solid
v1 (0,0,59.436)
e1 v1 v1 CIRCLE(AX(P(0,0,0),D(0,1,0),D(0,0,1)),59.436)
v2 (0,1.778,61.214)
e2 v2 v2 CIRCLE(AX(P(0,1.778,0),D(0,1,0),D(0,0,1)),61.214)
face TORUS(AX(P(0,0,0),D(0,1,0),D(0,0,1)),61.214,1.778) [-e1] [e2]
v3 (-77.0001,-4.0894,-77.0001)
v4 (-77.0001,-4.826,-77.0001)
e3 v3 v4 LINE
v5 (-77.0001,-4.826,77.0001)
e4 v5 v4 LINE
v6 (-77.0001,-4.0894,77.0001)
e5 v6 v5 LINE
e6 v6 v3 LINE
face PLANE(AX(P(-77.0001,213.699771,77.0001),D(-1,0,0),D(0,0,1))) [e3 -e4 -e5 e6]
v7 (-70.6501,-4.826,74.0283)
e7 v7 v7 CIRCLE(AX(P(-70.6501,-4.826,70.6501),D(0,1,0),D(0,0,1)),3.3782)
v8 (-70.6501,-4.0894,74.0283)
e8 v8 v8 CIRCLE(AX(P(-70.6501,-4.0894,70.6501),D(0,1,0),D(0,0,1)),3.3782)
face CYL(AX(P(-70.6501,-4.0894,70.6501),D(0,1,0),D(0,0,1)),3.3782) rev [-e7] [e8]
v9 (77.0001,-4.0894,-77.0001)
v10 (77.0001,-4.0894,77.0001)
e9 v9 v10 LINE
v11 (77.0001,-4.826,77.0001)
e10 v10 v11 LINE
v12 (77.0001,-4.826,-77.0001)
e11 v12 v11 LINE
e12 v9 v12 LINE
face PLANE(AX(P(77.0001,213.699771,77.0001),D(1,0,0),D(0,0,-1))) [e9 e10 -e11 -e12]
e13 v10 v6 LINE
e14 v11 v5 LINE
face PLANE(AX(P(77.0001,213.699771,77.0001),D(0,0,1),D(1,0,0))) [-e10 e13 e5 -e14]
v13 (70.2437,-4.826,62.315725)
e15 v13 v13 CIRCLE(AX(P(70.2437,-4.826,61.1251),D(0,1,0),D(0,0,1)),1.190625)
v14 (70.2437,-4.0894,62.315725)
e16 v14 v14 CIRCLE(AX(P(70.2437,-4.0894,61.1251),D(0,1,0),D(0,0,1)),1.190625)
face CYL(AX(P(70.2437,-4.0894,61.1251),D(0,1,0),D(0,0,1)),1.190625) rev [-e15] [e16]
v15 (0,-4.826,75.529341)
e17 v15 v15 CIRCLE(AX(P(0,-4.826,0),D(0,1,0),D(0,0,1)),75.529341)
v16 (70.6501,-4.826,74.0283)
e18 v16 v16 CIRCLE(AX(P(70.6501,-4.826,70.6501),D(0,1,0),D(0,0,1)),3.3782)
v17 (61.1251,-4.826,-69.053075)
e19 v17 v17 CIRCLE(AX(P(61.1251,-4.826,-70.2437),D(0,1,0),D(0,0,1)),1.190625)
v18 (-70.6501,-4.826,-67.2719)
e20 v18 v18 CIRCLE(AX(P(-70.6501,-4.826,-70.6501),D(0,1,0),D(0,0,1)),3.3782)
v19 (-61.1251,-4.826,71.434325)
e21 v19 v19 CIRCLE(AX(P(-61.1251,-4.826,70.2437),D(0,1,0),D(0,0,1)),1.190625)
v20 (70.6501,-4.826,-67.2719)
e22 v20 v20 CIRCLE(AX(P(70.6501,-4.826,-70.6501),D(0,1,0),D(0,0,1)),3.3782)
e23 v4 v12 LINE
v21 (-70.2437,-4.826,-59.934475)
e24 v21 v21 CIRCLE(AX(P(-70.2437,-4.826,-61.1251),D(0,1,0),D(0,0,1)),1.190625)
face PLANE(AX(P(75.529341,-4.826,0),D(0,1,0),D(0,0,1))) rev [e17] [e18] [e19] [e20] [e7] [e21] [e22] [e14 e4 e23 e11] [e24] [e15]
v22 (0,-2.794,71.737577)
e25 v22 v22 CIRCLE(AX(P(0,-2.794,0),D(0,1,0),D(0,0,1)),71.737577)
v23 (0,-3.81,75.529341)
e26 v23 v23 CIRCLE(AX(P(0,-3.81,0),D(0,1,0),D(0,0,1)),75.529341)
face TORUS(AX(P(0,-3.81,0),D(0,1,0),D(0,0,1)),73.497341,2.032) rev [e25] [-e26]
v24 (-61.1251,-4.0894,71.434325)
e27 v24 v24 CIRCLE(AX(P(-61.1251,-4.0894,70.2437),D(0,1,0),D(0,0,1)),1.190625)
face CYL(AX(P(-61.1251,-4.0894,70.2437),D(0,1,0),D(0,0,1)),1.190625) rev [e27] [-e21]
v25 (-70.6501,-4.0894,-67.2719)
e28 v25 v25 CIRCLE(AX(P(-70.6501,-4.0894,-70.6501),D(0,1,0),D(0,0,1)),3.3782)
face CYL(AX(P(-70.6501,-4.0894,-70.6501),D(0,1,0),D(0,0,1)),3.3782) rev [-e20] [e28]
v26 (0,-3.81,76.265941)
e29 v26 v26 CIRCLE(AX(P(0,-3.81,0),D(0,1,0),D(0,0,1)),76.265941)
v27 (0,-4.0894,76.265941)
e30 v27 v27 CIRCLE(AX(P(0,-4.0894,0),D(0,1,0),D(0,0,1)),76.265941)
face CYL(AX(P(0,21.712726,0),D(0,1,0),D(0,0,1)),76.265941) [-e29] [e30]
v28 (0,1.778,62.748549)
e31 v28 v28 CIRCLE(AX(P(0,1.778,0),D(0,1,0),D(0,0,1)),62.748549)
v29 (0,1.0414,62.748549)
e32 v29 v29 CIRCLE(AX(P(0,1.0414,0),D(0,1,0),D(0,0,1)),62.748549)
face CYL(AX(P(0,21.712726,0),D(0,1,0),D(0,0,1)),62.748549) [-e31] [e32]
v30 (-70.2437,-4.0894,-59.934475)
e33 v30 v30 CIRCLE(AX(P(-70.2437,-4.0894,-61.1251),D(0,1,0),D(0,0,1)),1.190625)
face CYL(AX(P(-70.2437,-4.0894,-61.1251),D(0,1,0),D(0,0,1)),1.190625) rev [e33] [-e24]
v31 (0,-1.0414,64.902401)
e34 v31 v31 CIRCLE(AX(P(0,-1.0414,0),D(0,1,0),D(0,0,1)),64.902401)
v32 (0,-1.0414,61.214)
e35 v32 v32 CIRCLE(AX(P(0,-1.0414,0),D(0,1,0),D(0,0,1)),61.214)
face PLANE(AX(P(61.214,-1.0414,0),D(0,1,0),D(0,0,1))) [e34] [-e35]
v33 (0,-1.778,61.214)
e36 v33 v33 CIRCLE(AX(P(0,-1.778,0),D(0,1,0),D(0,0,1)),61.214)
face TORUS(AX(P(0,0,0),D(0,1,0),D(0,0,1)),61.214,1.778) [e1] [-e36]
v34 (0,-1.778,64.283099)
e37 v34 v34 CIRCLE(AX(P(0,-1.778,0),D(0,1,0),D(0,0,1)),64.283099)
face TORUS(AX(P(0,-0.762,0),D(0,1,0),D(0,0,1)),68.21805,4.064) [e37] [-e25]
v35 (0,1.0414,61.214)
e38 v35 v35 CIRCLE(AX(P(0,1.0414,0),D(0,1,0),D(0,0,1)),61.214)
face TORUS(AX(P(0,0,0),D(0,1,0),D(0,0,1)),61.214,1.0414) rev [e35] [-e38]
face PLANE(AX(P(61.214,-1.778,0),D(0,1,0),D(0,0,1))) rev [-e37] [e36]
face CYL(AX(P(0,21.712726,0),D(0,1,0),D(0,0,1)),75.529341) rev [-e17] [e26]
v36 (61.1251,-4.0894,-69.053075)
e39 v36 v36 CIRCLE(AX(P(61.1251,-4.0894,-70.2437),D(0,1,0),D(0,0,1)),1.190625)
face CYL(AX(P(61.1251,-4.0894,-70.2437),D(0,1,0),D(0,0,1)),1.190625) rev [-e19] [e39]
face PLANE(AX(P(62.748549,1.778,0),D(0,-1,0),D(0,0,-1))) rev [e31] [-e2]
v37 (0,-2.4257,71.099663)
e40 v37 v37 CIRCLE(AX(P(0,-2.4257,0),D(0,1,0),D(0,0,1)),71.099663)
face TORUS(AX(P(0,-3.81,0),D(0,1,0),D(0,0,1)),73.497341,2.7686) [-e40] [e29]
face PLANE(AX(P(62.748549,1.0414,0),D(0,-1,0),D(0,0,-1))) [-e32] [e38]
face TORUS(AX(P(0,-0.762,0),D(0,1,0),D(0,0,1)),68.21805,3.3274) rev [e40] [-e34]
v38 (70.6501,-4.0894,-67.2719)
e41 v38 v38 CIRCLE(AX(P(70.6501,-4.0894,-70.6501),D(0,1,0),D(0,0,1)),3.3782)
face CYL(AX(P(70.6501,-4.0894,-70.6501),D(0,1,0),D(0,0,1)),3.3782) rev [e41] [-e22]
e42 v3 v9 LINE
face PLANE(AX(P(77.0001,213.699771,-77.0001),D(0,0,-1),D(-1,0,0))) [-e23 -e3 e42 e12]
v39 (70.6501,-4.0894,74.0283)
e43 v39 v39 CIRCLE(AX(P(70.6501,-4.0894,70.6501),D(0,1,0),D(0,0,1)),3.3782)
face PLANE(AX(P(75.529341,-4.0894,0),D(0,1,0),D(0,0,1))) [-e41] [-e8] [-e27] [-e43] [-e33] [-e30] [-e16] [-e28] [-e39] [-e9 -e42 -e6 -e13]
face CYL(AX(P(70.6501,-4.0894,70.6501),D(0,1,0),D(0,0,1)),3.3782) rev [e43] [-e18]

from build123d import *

# Parameters (mm, degrees)
SKETCH2_W                                 = 154.0002
SKETCH2_H                                 = 154.0002
SKETCH2_R                                 = 75.529340861
EXTRUDE1_DEPTH                            = 0.7366
EXTRUDE2_START                            = -0.7366
SKETCH3_R                                 = 75.529340861
EXTRUDE2_DEPTH                            = 0.7366
CIRPATTERN1_COUNT                         = 6
SKETCH5_W                                 = 3.3782
SKETCH5_H                                 = 0.7366
F_5_32_0_156250_DIAMETER_HOLE1_AT_2_COUNT = 2
F_5_32_0_156250_DIAMETER_HOLE1_AT_2_PITCH = 141.3002
F_5_32_0_156250_DIAMETER_HOLE1_AT_3_COUNT = 2
F_5_32_0_156250_DIAMETER_HOLE1_AT_3_PITCH = 141.3002
F_5_32_0_156250_DIAMETER_HOLE1_AT_4_COUNT = 2
F_5_32_0_156250_DIAMETER_HOLE1_AT_4_PITCH = 199.828659206
SKETCH7_W                                 = 2.3876
SKETCH7_H                                 = 8.128
F_5_32_0_156250_DIAMETER_HOLE2_AT_2_COUNT = 2
F_5_32_0_156250_DIAMETER_HOLE2_AT_2_PITCH = 121.0564
F_5_32_0_156250_DIAMETER_HOLE2_AT_3_COUNT = 2
F_5_32_0_156250_DIAMETER_HOLE2_AT_3_PITCH = 171.199602692
F_5_32_0_156250_DIAMETER_HOLE2_AT_4_COUNT = 2
F_5_32_0_156250_DIAMETER_HOLE2_AT_4_PITCH = 121.0564
CIRPATTERN2_COUNT                         = 4


# Read off the part's stored shape, not the designer's step: Revolve-Thin5
with BuildPart() as part:
    # Sketch1 → Revolve-Thin4 (revolve)
    with BuildSketch(Plane.XY, mode=Mode.PRIVATE) as revolve_thin4_sk:
        with BuildLine():
            Line((62.74854946, 1.778), (61.214, 1.778))
            ThreePointArc((61.214, 1.778), (59.436, 0), (61.214, -1.778))
            Line((61.214, -1.778), (64.28309892, -1.778))
            ThreePointArc((64.28309892, -1.778), (67.669225582, -4.788771381), (71.737577241, -2.794))
            ThreePointArc((71.737577241, -2.794), (74.023261161, -1.847238721), (75.529340861, -3.81))
            Line((75.529340861, -3.81), (75.529340861, -4.826))
            Line((75.529340861, -4.826), (77.0001, -4.826))
            Line((77.0001, -4.826), (77.0001, -4.0894))
            Line((77.0001, -4.0894), (76.265940861, -4.0894))
            Line((76.265940861, -4.0894), (76.265940861, -3.81))
            ThreePointArc((76.265940861, -3.81), (74.21390727, -1.135737757), (71.099662929, -2.4257))
            ThreePointArc((71.099662929, -2.4257), (67.492675346, -4.00937161), (64.902401285, -1.0414))
            Line((64.902401285, -1.0414), (61.214, -1.0414))
            ThreePointArc((61.214, -1.0414), (60.1726, 0), (61.214, 1.0414))
            Line((61.214, 1.0414), (62.74854946, 1.0414))
            Line((62.74854946, 1.0414), (62.74854946, 1.778))
        make_face()
    revolve(revolve_thin4_sk.sketch.rotate(Axis((0, 21.71272626, 0), (0, -1, 0)), 90), axis=Axis((0, 21.71272626, 0), (0, -1, 0)))

    # Sketch2 → Extrude1 (add)
    with BuildSketch(Plane.XZ.offset(4.826)):
        Rectangle(SKETCH2_W, SKETCH2_H)
        with Locations(Location((0, 0, 0), (0, 0, 90))):
            Circle(SKETCH2_R, mode=Mode.SUBTRACT)
    extrude(amount=-EXTRUDE1_DEPTH)

    # Sketch5 → 5/32 (0.156250) Diameter Hole1 (revolve, cut)
    with BuildSketch(Plane(origin=(70.6501, -4.0894, -70.6501), x_dir=(0, 0, 1), z_dir=(1, 0, 0))):
        with Locations((1.6891, 0.3683)):
            Rectangle(SKETCH5_W, SKETCH5_H)
    f_5_32_0_156250_diameter_hole1 = revolve(axis=Axis((70.6501, 2.2606, -70.6501), (0, -1, 0)), mode=Mode.SUBTRACT)

    # 5/32 (0.156250) Diameter Hole1 at 2: 5/32 (0.156250) Diameter Hole1 ×2
    with Locations(*[(0, 0, i * F_5_32_0_156250_DIAMETER_HOLE1_AT_2_PITCH) for i in range(1, F_5_32_0_156250_DIAMETER_HOLE1_AT_2_COUNT)]):
        add(f_5_32_0_156250_diameter_hole1, mode=Mode.SUBTRACT)

    # 5/32 (0.156250) Diameter Hole1 at 3: 5/32 (0.156250) Diameter Hole1 ×2
    with Locations(*[(-i * F_5_32_0_156250_DIAMETER_HOLE1_AT_3_PITCH, 0, 0) for i in range(1, F_5_32_0_156250_DIAMETER_HOLE1_AT_3_COUNT)]):
        add(f_5_32_0_156250_diameter_hole1, mode=Mode.SUBTRACT)

    # 5/32 (0.156250) Diameter Hole1 at 4: 5/32 (0.156250) Diameter Hole1 ×2
    with Locations(*[Vector(-0.7071067811865476, 0, 0.7071067811865476) * (i * F_5_32_0_156250_DIAMETER_HOLE1_AT_4_PITCH) for i in range(1, F_5_32_0_156250_DIAMETER_HOLE1_AT_4_COUNT)]):
        add(f_5_32_0_156250_diameter_hole1, mode=Mode.SUBTRACT)

    # Sketch11 → 3/32 (0.093750) Diameter Hole2 (revolve, cut)
    with BuildSketch(Plane(origin=(-70.2437, -4.0894, -61.1251), x_dir=(0, 0, 1), z_dir=(1, 0, 0))):
        Polygon((0, 0), (0, 26.115399675), (1.190625, 25.4), (1.190625, 0), align=None)
    f_3_32_0_093750_diameter_hole2 = revolve(axis=Axis((-70.2437, 2.2606, -61.1251), (0, -1, 0)), mode=Mode.SUBTRACT)

    # CirPattern2: 3/32 (0.093750) Diameter Hole2 ×4 about axis
    cirpattern2_axis = Axis((0, 0, 0), (0, 1, 0))
    for i in range(1, CIRPATTERN2_COUNT):
        add(f_3_32_0_093750_diameter_hole2.rotate(cirpattern2_axis, i * 360 / CIRPATTERN2_COUNT), mode=Mode.SUBTRACT)


with BuildPart() as body_2:
    # Revolve-Thin5 outline → Revolve-Thin5 (revolve)
    with BuildSketch(Plane.XY):
        with BuildLine():
            Line((76.265940861, 2.5654), (77.0001, 2.5654))
            Line((77.0001, 2.5654), (77.0001, 3.302))
            Line((77.0001, 3.302), (75.529340861, 3.302))
            Line((75.529340861, 3.302), (75.529340861, 2.286))
            ThreePointArc((75.529340861, 2.286), (74.023261161, 0.323238721), (71.737577241, 1.27))
            ThreePointArc((71.737577241, 1.27), (68.088390068, 3.299931105), (64.576093872, 1.0414))
            Line((64.576093872, 1.0414), (61.214, 1.0414))
            Line((61.214, 1.0414), (61.214, 0.3048))
            Line((61.214, 0.3048), (65.066299927, 0.3048))
            ThreePointArc((65.066299927, 0.3048), (67.890458911, 2.54923464), (71.099662929, 0.9017))
            ThreePointArc((71.099662929, 0.9017), (74.21390727, -0.388262243), (76.265940861, 2.286))
            Line((76.265940861, 2.286), (76.265940861, 2.5654))
        make_face()
    revolve(axis=Axis((0, 0, 0), (0, 1, 0)))

    # Sketch3 → Extrude2 (add)
    with BuildSketch(Plane(origin=(0, 3.302, 0), x_dir=(-1, 0, 0), z_dir=(0, 1, 0)).offset(EXTRUDE2_START)):
        Polygon((0, -108.894585724), (108.894585724, 0), (0, 108.894585724), (-108.894585724, 0), align=None)
        with Locations(Location((0, 0, 0), (0, 0, 90))):
            Circle(SKETCH3_R, mode=Mode.SUBTRACT)
    extrude(amount=EXTRUDE2_DEPTH)

    # Sketch7 → 5/32 (0.156250) Diameter Hole2 (revolve, cut)
    with BuildSketch(Plane(origin=(85.599801346, 3.302, 0), x_dir=(0, 0, 1), z_dir=(1, 0, 0))):
        with Locations((1.1938, 4.064)):
            Rectangle(SKETCH7_W, SKETCH7_H)
    f_5_32_0_156250_diameter_hole2 = revolve(axis=Axis((85.599801346, 9.652, 0), (0, -1, 0)), mode=Mode.SUBTRACT)

    # 5/32 (0.156250) Diameter Hole2 at 2: 5/32 (0.156250) Diameter Hole2 ×2
    with Locations(*[Vector(-0.7071067811865476, 0, -0.7071067811865476) * (i * F_5_32_0_156250_DIAMETER_HOLE2_AT_2_PITCH) for i in range(1, F_5_32_0_156250_DIAMETER_HOLE2_AT_2_COUNT)]):
        add(f_5_32_0_156250_diameter_hole2, mode=Mode.SUBTRACT)

    # 5/32 (0.156250) Diameter Hole2 at 3: 5/32 (0.156250) Diameter Hole2 ×2
    with Locations(*[(-i * F_5_32_0_156250_DIAMETER_HOLE2_AT_3_PITCH, 0, 0) for i in range(1, F_5_32_0_156250_DIAMETER_HOLE2_AT_3_COUNT)]):
        add(f_5_32_0_156250_diameter_hole2, mode=Mode.SUBTRACT)

    # 5/32 (0.156250) Diameter Hole2 at 4: 5/32 (0.156250) Diameter Hole2 ×2
    with Locations(*[Vector(-0.7071067811865476, 0, 0.7071067811865476) * (i * F_5_32_0_156250_DIAMETER_HOLE2_AT_4_PITCH) for i in range(1, F_5_32_0_156250_DIAMETER_HOLE2_AT_4_COUNT)]):
        add(f_5_32_0_156250_diameter_hole2, mode=Mode.SUBTRACT)


with BuildPart() as body_3:
    # Sketch4 → Revolve1 (revolve)
    with BuildSketch(Plane.XY):
        with BuildLine():
            Line((68.21805, 2.5146), (68.21805, -4.0386))
            ThreePointArc((68.21805, -4.0386), (71.49465, -0.762), (68.21805, 2.5146))
        make_face()
    revolve(axis=Axis((68.21805, 2.837450101, 0), (0, -1, 0)))


with BuildPart() as cirpattern1_1:
    # CirPattern1: pattern copy
    add(body_3.part.rotate(Axis((0, 0, 0), (0, 1, 0)), 1 * 360 / CIRPATTERN1_COUNT))


with BuildPart() as cirpattern1_2:
    # CirPattern1: pattern copy
    add(body_3.part.rotate(Axis((0, 0, 0), (0, 1, 0)), 2 * 360 / CIRPATTERN1_COUNT))


with BuildPart() as cirpattern1_3:
    # CirPattern1: pattern copy
    add(body_3.part.rotate(Axis((0, 0, 0), (0, 1, 0)), 3 * 360 / CIRPATTERN1_COUNT))


with BuildPart() as cirpattern1_4:
    # CirPattern1: pattern copy
    add(body_3.part.rotate(Axis((0, 0, 0), (0, 1, 0)), 4 * 360 / CIRPATTERN1_COUNT))


with BuildPart() as cirpattern1_5:
    # CirPattern1: pattern copy
    add(body_3.part.rotate(Axis((0, 0, 0), (0, 1, 0)), 5 * 360 / CIRPATTERN1_COUNT))


solid = part.part
